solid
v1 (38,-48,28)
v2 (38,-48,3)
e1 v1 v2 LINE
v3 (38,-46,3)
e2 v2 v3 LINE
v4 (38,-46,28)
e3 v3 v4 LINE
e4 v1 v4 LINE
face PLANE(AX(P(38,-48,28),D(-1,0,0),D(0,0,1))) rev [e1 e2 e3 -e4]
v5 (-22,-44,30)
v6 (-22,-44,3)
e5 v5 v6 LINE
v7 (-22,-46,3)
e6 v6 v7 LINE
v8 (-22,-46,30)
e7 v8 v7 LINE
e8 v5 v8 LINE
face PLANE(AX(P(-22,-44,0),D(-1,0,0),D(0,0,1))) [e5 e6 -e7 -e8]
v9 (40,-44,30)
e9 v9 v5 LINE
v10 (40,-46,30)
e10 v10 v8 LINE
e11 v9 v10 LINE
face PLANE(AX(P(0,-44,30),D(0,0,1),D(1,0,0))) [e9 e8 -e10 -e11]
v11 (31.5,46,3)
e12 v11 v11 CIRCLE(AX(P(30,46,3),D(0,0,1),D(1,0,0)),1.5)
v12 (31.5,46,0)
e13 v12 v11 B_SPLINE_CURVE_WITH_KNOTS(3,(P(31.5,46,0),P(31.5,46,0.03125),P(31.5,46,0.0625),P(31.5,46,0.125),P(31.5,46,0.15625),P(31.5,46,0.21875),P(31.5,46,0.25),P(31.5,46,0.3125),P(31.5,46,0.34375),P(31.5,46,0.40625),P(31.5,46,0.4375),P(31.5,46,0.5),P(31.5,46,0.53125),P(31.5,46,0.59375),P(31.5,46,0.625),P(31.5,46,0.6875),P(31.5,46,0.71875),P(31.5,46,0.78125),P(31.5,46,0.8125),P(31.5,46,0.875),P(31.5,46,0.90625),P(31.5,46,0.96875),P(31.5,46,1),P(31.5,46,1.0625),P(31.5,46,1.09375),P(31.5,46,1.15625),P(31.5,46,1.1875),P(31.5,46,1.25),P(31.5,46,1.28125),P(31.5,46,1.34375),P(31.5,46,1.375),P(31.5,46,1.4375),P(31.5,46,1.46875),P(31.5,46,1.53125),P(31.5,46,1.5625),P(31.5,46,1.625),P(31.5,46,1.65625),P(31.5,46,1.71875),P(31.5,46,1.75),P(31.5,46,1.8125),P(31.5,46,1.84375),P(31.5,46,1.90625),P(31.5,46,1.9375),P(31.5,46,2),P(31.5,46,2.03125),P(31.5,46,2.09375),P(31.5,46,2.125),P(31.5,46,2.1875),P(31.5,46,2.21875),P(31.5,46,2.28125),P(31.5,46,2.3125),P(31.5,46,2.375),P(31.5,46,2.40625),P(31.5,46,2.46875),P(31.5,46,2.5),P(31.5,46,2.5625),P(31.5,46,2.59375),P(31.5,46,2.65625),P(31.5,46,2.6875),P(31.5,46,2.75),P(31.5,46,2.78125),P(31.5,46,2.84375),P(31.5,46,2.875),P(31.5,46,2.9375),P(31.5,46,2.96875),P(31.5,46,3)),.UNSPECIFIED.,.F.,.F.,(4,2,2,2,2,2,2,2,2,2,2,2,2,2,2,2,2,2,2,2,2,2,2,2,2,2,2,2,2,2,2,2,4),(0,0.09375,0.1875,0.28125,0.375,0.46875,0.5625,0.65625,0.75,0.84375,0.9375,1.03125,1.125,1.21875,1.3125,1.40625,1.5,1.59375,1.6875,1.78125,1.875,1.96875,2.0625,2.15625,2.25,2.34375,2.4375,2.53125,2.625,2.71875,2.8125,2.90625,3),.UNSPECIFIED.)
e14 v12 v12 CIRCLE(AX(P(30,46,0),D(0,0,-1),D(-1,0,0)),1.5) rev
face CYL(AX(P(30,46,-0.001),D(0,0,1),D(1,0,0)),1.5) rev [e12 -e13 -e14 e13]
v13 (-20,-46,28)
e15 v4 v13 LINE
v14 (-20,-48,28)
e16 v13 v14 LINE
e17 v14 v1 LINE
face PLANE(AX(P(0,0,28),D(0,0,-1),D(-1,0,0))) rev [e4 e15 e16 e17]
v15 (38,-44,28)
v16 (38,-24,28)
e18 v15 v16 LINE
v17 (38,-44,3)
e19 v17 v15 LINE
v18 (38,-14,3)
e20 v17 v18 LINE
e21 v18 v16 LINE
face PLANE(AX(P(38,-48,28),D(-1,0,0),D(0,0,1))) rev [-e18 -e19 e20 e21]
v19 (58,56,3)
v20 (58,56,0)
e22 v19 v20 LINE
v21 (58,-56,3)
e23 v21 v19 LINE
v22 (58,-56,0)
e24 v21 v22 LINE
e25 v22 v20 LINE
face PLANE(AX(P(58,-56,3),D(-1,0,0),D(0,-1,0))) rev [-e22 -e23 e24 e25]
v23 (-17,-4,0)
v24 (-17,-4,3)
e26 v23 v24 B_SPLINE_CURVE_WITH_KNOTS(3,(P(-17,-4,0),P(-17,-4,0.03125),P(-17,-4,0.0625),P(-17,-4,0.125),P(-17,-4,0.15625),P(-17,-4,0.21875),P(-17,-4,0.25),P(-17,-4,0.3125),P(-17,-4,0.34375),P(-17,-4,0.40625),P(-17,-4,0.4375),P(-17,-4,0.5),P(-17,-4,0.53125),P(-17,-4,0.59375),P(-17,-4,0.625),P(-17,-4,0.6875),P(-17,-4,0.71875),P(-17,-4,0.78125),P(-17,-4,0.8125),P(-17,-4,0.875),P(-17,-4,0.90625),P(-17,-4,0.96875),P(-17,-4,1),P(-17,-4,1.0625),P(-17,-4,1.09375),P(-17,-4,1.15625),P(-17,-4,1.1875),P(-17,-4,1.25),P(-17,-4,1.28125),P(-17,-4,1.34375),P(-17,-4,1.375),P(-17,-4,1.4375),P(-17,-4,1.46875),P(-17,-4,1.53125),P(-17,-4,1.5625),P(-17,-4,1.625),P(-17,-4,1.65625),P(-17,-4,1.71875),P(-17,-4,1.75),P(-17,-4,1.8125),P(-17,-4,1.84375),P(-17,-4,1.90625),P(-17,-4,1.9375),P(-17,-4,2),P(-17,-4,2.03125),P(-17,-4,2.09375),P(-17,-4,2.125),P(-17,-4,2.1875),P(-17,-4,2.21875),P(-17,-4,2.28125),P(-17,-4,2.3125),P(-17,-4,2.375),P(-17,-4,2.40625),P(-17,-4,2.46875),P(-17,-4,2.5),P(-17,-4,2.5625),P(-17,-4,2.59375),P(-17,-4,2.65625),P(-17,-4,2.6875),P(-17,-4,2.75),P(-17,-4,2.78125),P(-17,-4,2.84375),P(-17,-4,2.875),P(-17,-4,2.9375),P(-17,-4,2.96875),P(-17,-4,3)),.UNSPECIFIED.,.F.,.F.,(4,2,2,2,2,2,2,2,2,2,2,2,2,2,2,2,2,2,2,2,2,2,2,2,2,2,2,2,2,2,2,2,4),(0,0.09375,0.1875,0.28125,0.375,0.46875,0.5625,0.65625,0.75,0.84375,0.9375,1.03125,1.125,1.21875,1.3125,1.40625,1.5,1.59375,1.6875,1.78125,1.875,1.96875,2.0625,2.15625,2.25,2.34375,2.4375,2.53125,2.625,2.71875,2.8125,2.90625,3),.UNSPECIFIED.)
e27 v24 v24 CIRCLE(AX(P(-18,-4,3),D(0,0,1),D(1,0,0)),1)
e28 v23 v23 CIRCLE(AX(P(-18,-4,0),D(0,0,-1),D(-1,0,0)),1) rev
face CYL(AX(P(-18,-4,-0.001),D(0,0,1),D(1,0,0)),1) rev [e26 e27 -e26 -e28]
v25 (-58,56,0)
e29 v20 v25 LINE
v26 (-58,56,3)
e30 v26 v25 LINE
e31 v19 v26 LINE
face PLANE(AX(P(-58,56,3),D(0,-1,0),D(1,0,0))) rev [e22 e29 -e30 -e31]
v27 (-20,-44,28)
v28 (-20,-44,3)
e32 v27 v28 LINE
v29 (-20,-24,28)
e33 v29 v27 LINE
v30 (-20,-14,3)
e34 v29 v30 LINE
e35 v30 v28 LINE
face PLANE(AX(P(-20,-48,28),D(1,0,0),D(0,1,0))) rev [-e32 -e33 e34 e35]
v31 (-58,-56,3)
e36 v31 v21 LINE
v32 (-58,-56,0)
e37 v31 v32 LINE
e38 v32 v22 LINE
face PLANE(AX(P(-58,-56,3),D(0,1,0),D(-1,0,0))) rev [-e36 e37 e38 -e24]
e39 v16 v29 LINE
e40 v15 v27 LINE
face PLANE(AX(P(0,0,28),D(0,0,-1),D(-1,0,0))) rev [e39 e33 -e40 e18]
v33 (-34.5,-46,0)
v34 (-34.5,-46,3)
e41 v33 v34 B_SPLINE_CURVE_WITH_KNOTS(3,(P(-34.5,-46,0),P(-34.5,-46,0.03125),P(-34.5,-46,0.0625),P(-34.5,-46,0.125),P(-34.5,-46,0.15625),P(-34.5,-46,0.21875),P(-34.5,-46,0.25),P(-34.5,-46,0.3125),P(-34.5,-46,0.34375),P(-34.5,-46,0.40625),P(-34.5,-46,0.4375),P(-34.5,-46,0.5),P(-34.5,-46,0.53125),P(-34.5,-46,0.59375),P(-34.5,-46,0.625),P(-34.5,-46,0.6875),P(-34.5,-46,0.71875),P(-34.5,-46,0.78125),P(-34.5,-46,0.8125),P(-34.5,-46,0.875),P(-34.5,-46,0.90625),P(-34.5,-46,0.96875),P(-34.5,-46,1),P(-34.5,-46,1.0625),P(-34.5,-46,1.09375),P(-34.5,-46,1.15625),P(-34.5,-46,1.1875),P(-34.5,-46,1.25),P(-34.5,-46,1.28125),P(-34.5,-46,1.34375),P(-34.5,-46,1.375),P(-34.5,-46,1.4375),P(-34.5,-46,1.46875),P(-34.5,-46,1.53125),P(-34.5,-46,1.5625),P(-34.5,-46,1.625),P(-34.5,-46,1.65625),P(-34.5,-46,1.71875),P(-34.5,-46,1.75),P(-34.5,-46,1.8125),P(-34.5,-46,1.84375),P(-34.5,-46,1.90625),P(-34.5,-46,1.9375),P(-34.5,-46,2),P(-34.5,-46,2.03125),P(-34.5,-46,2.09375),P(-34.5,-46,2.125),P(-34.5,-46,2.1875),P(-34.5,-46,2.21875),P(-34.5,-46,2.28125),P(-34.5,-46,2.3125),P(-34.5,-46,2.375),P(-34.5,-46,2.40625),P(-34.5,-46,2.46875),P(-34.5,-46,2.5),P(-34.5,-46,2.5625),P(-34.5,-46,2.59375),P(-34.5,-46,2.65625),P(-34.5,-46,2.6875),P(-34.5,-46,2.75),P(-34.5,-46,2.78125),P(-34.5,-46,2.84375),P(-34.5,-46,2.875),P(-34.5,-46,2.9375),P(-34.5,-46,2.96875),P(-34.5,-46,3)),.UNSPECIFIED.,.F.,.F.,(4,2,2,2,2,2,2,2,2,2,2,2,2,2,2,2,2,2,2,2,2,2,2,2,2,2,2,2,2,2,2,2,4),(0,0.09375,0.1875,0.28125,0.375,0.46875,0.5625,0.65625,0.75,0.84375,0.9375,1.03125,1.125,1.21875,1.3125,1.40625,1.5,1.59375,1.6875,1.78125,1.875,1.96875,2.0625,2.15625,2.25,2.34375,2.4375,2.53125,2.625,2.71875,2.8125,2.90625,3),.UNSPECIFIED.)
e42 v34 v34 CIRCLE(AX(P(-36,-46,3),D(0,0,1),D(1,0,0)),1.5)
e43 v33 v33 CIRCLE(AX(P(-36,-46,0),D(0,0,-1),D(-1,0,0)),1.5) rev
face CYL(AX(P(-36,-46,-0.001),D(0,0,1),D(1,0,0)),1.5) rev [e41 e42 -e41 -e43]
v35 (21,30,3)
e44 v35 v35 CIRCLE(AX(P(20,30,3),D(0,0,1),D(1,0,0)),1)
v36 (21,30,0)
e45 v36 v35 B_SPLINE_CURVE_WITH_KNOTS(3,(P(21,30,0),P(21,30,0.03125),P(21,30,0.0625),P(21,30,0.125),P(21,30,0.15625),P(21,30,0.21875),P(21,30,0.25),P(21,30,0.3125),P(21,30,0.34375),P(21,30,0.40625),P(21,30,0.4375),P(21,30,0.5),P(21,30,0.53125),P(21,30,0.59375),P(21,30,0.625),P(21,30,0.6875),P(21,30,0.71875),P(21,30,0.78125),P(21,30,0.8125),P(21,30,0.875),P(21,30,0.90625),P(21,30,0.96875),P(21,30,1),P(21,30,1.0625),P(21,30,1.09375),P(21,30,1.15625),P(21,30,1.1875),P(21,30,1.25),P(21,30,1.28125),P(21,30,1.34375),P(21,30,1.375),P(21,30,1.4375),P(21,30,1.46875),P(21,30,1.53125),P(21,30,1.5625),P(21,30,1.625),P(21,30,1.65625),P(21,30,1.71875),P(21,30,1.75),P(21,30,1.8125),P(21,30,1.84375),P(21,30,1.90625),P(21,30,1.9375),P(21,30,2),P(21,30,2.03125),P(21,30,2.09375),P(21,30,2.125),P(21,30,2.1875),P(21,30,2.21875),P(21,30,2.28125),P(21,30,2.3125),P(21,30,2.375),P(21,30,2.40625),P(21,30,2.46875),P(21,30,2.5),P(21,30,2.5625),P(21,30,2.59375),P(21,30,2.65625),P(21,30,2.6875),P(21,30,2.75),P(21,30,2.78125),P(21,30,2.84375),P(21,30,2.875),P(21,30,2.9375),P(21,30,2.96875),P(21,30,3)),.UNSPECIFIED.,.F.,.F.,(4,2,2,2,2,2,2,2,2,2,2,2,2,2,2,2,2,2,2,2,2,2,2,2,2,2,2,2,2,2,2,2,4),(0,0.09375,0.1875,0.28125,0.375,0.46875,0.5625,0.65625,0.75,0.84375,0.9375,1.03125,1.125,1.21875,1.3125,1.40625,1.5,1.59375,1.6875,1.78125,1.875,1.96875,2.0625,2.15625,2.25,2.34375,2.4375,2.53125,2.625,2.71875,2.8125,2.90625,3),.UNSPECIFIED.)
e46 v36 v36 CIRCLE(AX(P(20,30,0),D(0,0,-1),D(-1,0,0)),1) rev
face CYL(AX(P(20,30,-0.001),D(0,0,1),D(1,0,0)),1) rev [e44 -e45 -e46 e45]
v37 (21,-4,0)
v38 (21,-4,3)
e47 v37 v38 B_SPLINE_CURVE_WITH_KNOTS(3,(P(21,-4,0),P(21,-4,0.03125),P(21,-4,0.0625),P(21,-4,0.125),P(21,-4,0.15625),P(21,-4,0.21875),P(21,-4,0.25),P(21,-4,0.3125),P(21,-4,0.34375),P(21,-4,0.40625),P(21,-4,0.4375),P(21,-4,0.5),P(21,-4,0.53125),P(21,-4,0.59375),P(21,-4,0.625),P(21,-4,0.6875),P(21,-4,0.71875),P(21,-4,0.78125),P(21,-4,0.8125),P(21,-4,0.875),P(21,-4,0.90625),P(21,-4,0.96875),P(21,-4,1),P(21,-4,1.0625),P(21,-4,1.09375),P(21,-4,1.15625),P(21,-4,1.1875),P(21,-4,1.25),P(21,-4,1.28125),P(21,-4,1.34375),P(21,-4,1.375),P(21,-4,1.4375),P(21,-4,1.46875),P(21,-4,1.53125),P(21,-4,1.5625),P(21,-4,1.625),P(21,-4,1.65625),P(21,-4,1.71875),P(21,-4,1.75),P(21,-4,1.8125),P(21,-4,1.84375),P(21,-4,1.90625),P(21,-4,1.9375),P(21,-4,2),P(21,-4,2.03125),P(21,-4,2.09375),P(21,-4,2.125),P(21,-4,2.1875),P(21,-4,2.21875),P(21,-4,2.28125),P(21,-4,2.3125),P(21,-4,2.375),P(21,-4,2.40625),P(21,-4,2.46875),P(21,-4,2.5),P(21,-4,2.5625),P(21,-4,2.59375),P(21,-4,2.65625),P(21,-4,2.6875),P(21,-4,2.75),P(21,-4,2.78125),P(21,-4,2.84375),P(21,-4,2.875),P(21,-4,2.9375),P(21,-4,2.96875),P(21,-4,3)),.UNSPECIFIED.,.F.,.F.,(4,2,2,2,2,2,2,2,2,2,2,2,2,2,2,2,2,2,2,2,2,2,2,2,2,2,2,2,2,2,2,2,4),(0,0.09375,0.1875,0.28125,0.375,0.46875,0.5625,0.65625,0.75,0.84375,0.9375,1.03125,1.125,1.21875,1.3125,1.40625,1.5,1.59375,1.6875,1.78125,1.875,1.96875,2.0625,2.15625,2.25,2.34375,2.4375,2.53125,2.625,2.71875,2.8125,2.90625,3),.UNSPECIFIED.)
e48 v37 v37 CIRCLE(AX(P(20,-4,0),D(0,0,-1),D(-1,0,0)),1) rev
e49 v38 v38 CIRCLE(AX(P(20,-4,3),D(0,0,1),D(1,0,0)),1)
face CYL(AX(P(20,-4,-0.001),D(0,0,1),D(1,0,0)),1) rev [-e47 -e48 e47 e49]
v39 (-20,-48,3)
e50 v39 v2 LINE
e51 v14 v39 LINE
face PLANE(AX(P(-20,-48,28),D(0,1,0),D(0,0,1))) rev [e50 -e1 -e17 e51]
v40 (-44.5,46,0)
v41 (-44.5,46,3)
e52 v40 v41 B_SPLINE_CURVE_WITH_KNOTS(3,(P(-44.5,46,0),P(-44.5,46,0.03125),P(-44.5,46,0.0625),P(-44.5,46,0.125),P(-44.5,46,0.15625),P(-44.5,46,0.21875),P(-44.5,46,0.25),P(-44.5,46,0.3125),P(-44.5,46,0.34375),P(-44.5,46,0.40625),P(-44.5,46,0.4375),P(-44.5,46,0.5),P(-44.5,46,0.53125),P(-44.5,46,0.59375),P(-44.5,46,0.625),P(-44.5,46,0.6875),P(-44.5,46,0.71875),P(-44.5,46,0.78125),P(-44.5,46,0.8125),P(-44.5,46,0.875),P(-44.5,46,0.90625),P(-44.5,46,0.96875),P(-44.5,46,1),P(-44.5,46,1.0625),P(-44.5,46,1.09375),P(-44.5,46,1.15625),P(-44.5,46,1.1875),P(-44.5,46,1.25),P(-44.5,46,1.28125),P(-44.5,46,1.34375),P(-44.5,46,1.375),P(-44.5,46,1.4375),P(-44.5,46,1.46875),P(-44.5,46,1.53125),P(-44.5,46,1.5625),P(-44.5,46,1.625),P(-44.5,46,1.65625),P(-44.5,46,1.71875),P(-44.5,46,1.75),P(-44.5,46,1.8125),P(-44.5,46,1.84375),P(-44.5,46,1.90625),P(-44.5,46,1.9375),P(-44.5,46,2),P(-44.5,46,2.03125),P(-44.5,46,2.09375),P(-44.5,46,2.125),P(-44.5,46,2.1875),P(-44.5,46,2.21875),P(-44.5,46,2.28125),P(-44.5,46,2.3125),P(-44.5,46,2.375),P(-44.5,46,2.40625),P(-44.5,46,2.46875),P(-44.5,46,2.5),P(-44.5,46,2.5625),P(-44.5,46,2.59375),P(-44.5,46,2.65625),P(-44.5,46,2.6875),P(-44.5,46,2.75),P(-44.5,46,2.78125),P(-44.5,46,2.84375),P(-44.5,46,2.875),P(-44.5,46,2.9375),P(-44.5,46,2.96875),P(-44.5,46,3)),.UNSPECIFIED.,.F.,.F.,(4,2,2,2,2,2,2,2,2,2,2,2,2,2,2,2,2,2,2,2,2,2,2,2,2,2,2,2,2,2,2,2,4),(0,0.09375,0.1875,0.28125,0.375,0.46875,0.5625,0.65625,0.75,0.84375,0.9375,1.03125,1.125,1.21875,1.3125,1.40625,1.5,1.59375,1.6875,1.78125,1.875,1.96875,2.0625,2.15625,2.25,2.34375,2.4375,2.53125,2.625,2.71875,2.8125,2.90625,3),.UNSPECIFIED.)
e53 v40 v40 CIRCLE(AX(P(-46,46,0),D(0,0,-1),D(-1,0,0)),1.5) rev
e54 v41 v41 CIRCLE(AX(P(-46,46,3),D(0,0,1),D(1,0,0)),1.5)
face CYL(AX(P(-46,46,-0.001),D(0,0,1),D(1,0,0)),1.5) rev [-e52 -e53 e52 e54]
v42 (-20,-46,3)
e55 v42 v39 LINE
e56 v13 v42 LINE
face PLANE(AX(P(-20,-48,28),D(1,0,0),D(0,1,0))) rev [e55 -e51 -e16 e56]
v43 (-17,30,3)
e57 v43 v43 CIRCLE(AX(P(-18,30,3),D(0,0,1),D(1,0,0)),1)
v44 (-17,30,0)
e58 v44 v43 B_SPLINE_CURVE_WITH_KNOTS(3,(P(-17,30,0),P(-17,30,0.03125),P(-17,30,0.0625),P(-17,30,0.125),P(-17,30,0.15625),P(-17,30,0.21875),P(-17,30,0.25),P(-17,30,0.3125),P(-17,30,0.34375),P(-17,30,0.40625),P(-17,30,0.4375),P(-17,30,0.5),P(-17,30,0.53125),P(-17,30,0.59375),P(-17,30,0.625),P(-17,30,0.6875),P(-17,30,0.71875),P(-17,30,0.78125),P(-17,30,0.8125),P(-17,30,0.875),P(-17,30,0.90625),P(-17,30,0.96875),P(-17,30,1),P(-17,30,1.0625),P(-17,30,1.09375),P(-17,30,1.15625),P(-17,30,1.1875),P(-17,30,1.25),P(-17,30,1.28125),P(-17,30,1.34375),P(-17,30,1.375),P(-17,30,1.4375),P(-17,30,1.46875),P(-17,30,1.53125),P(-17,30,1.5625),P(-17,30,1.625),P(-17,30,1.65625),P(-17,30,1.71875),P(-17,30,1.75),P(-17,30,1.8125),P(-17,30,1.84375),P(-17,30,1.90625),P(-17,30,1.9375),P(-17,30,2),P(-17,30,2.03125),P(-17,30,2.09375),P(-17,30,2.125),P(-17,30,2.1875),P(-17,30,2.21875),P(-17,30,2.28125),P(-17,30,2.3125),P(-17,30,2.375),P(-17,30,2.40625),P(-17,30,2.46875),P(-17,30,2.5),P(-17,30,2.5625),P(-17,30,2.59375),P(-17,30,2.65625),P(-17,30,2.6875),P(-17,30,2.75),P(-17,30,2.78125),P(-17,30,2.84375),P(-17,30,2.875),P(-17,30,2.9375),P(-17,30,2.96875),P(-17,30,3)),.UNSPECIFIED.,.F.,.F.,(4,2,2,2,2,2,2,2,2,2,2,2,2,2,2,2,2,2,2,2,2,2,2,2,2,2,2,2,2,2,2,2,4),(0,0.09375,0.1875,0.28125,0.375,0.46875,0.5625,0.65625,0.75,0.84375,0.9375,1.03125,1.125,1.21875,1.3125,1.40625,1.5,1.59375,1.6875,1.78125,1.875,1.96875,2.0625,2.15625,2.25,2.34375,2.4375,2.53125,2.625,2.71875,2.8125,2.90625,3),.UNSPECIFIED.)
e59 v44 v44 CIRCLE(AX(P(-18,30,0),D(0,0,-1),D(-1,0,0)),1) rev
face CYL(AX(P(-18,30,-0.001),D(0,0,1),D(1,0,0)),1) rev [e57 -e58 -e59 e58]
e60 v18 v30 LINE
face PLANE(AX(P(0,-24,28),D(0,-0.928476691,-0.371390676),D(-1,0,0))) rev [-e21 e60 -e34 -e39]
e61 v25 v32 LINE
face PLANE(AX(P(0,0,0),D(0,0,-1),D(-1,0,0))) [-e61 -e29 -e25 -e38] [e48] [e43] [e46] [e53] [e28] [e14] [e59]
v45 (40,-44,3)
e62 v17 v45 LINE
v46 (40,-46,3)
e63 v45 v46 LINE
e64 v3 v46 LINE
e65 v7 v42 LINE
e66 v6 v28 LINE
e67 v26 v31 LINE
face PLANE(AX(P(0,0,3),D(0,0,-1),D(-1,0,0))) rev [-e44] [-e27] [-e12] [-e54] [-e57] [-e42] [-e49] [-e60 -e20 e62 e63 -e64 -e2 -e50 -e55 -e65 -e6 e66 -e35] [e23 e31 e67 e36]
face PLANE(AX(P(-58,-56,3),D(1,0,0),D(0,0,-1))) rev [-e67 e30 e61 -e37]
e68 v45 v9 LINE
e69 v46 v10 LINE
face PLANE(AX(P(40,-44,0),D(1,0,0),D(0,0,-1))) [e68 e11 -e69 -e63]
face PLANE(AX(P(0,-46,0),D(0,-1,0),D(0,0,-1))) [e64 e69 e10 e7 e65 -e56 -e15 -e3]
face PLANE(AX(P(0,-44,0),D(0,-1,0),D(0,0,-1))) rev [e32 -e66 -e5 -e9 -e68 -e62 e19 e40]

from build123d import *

# Parameters (mm, degrees)
SKETCH1_W           = 116
SKETCH1_H           = 112
BOSS_EXTRUDE1_DEPTH = 3
SKETCH2_W           = 58
SKETCH2_H           = 34
BOSS_EXTRUDE2_DEPTH = 25
CHAMFER1_SIZE2      = 10
CHAMFER1_SIZE       = 25
BOSS_EXTRUDE4_DEPTH = 2
CUT_EXTRUDE1_REACH  = 87.024
SKETCH5_R           = 1.5
CUT_EXTRUDE2_REACH  = 87.024
SKETCH6_R           = 1


with BuildPart() as part:
    # Sketch1 → Boss-Extrude1 (new body)
    with BuildSketch(Plane.XY):
        Rectangle(SKETCH1_W, SKETCH1_H)
    extrude(amount=BOSS_EXTRUDE1_DEPTH)

    # Sketch2 → Boss-Extrude2 (add)
    with BuildSketch(Plane.XY.offset(3)):
        with Locations((9, -31)):
            Rectangle(SKETCH2_W, SKETCH2_H)
    extrude(amount=BOSS_EXTRUDE2_DEPTH)

    # Chamfer1
    chamfer1_edges = [part.edges().sort_by_distance(p)[0] for p in [
        (9, -14, 28),
    ]]
    chamfer1_side = [part.faces().sort_by_distance(p)[0] for p in [
        (9, -14, 27.8),
    ]]
    chamfer(chamfer1_edges, length=CHAMFER1_SIZE - 0.0001, length2=CHAMFER1_SIZE2 - 0.0001, reference=chamfer1_side[0])  # a hair under: the kernel refuses the full size

    # Sketch4 → Boss-Extrude4 (add)
    with BuildSketch(Plane(origin=(0, -46, 0), x_dir=(-1, 0, 0), z_dir=(0, -1, 0))):
        Polygon((22, -3), (20, -3), (20, -28), (-38, -28), (-38, -3), (-40, -3), (-40, -30), (22, -30), align=None)
    extrude(amount=-BOSS_EXTRUDE4_DEPTH)

    # Sketch5 → Cut-Extrude1 (cut, up to next)
    with BuildSketch(Plane.XY.offset(3), mode=Mode.PRIVATE) as cut_extrude1_sk1:
        with Locations((-46, 46)):
            Circle(SKETCH5_R)
    cut_extrude1_tool1 = extrude(cut_extrude1_sk1.sketch, amount=-CUT_EXTRUDE1_REACH, mode=Mode.PRIVATE) & part.part
    # Sketch5 → Cut-Extrude1 (cut, up to next)
    with BuildSketch(Plane.XY.offset(3), mode=Mode.PRIVATE) as cut_extrude1_sk2:
        with Locations((30, 46)):
            Circle(SKETCH5_R)
    cut_extrude1_tool2 = extrude(cut_extrude1_sk2.sketch, amount=-CUT_EXTRUDE1_REACH, mode=Mode.PRIVATE) & part.part
    # Sketch5 → Cut-Extrude1 (cut, up to next)
    with BuildSketch(Plane.XY.offset(3), mode=Mode.PRIVATE) as cut_extrude1_sk3:
        with Locations((-36, -46)):
            Circle(SKETCH5_R)
    cut_extrude1_tool3 = extrude(cut_extrude1_sk3.sketch, amount=-CUT_EXTRUDE1_REACH, mode=Mode.PRIVATE) & part.part
    add(cut_extrude1_tool1.solids().sort_by_distance((-46, 46, 3))[0], mode=Mode.SUBTRACT)
    add(cut_extrude1_tool2.solids().sort_by_distance((30, 46, 3))[0], mode=Mode.SUBTRACT)
    add(cut_extrude1_tool3.solids().sort_by_distance((-36, -46, 3))[0], mode=Mode.SUBTRACT)

    # Sketch6 → Cut-Extrude2 (cut, up to next)
    with BuildSketch(Plane.XY.offset(3), mode=Mode.PRIVATE) as cut_extrude2_sk1:
        with Locations((-18, 30)):
            Circle(SKETCH6_R)
    cut_extrude2_tool1 = extrude(cut_extrude2_sk1.sketch, amount=-CUT_EXTRUDE2_REACH, mode=Mode.PRIVATE) & part.part
    # Sketch6 → Cut-Extrude2 (cut, up to next)
    with BuildSketch(Plane.XY.offset(3), mode=Mode.PRIVATE) as cut_extrude2_sk2:
        with Locations((20, 30)):
            Circle(SKETCH6_R)
    cut_extrude2_tool2 = extrude(cut_extrude2_sk2.sketch, amount=-CUT_EXTRUDE2_REACH, mode=Mode.PRIVATE) & part.part
    # Sketch6 → Cut-Extrude2 (cut, up to next)
    with BuildSketch(Plane.XY.offset(3), mode=Mode.PRIVATE) as cut_extrude2_sk3:
        with Locations((-18, -4)):
            Circle(SKETCH6_R)
    cut_extrude2_tool3 = extrude(cut_extrude2_sk3.sketch, amount=-CUT_EXTRUDE2_REACH, mode=Mode.PRIVATE) & part.part
    # Sketch6 → Cut-Extrude2 (cut, up to next)
    with BuildSketch(Plane.XY.offset(3), mode=Mode.PRIVATE) as cut_extrude2_sk4:
        with Locations((20, -4)):
            Circle(SKETCH6_R)
    cut_extrude2_tool4 = extrude(cut_extrude2_sk4.sketch, amount=-CUT_EXTRUDE2_REACH, mode=Mode.PRIVATE) & part.part
    add(cut_extrude2_tool1.solids().sort_by_distance((-18, 30, 3))[0], mode=Mode.SUBTRACT)
    add(cut_extrude2_tool2.solids().sort_by_distance((20, 30, 3))[0], mode=Mode.SUBTRACT)
    add(cut_extrude2_tool3.solids().sort_by_distance((-18, -4, 3))[0], mode=Mode.SUBTRACT)
    add(cut_extrude2_tool4.solids().sort_by_distance((20, -4, 3))[0], mode=Mode.SUBTRACT)


solid = part.part
